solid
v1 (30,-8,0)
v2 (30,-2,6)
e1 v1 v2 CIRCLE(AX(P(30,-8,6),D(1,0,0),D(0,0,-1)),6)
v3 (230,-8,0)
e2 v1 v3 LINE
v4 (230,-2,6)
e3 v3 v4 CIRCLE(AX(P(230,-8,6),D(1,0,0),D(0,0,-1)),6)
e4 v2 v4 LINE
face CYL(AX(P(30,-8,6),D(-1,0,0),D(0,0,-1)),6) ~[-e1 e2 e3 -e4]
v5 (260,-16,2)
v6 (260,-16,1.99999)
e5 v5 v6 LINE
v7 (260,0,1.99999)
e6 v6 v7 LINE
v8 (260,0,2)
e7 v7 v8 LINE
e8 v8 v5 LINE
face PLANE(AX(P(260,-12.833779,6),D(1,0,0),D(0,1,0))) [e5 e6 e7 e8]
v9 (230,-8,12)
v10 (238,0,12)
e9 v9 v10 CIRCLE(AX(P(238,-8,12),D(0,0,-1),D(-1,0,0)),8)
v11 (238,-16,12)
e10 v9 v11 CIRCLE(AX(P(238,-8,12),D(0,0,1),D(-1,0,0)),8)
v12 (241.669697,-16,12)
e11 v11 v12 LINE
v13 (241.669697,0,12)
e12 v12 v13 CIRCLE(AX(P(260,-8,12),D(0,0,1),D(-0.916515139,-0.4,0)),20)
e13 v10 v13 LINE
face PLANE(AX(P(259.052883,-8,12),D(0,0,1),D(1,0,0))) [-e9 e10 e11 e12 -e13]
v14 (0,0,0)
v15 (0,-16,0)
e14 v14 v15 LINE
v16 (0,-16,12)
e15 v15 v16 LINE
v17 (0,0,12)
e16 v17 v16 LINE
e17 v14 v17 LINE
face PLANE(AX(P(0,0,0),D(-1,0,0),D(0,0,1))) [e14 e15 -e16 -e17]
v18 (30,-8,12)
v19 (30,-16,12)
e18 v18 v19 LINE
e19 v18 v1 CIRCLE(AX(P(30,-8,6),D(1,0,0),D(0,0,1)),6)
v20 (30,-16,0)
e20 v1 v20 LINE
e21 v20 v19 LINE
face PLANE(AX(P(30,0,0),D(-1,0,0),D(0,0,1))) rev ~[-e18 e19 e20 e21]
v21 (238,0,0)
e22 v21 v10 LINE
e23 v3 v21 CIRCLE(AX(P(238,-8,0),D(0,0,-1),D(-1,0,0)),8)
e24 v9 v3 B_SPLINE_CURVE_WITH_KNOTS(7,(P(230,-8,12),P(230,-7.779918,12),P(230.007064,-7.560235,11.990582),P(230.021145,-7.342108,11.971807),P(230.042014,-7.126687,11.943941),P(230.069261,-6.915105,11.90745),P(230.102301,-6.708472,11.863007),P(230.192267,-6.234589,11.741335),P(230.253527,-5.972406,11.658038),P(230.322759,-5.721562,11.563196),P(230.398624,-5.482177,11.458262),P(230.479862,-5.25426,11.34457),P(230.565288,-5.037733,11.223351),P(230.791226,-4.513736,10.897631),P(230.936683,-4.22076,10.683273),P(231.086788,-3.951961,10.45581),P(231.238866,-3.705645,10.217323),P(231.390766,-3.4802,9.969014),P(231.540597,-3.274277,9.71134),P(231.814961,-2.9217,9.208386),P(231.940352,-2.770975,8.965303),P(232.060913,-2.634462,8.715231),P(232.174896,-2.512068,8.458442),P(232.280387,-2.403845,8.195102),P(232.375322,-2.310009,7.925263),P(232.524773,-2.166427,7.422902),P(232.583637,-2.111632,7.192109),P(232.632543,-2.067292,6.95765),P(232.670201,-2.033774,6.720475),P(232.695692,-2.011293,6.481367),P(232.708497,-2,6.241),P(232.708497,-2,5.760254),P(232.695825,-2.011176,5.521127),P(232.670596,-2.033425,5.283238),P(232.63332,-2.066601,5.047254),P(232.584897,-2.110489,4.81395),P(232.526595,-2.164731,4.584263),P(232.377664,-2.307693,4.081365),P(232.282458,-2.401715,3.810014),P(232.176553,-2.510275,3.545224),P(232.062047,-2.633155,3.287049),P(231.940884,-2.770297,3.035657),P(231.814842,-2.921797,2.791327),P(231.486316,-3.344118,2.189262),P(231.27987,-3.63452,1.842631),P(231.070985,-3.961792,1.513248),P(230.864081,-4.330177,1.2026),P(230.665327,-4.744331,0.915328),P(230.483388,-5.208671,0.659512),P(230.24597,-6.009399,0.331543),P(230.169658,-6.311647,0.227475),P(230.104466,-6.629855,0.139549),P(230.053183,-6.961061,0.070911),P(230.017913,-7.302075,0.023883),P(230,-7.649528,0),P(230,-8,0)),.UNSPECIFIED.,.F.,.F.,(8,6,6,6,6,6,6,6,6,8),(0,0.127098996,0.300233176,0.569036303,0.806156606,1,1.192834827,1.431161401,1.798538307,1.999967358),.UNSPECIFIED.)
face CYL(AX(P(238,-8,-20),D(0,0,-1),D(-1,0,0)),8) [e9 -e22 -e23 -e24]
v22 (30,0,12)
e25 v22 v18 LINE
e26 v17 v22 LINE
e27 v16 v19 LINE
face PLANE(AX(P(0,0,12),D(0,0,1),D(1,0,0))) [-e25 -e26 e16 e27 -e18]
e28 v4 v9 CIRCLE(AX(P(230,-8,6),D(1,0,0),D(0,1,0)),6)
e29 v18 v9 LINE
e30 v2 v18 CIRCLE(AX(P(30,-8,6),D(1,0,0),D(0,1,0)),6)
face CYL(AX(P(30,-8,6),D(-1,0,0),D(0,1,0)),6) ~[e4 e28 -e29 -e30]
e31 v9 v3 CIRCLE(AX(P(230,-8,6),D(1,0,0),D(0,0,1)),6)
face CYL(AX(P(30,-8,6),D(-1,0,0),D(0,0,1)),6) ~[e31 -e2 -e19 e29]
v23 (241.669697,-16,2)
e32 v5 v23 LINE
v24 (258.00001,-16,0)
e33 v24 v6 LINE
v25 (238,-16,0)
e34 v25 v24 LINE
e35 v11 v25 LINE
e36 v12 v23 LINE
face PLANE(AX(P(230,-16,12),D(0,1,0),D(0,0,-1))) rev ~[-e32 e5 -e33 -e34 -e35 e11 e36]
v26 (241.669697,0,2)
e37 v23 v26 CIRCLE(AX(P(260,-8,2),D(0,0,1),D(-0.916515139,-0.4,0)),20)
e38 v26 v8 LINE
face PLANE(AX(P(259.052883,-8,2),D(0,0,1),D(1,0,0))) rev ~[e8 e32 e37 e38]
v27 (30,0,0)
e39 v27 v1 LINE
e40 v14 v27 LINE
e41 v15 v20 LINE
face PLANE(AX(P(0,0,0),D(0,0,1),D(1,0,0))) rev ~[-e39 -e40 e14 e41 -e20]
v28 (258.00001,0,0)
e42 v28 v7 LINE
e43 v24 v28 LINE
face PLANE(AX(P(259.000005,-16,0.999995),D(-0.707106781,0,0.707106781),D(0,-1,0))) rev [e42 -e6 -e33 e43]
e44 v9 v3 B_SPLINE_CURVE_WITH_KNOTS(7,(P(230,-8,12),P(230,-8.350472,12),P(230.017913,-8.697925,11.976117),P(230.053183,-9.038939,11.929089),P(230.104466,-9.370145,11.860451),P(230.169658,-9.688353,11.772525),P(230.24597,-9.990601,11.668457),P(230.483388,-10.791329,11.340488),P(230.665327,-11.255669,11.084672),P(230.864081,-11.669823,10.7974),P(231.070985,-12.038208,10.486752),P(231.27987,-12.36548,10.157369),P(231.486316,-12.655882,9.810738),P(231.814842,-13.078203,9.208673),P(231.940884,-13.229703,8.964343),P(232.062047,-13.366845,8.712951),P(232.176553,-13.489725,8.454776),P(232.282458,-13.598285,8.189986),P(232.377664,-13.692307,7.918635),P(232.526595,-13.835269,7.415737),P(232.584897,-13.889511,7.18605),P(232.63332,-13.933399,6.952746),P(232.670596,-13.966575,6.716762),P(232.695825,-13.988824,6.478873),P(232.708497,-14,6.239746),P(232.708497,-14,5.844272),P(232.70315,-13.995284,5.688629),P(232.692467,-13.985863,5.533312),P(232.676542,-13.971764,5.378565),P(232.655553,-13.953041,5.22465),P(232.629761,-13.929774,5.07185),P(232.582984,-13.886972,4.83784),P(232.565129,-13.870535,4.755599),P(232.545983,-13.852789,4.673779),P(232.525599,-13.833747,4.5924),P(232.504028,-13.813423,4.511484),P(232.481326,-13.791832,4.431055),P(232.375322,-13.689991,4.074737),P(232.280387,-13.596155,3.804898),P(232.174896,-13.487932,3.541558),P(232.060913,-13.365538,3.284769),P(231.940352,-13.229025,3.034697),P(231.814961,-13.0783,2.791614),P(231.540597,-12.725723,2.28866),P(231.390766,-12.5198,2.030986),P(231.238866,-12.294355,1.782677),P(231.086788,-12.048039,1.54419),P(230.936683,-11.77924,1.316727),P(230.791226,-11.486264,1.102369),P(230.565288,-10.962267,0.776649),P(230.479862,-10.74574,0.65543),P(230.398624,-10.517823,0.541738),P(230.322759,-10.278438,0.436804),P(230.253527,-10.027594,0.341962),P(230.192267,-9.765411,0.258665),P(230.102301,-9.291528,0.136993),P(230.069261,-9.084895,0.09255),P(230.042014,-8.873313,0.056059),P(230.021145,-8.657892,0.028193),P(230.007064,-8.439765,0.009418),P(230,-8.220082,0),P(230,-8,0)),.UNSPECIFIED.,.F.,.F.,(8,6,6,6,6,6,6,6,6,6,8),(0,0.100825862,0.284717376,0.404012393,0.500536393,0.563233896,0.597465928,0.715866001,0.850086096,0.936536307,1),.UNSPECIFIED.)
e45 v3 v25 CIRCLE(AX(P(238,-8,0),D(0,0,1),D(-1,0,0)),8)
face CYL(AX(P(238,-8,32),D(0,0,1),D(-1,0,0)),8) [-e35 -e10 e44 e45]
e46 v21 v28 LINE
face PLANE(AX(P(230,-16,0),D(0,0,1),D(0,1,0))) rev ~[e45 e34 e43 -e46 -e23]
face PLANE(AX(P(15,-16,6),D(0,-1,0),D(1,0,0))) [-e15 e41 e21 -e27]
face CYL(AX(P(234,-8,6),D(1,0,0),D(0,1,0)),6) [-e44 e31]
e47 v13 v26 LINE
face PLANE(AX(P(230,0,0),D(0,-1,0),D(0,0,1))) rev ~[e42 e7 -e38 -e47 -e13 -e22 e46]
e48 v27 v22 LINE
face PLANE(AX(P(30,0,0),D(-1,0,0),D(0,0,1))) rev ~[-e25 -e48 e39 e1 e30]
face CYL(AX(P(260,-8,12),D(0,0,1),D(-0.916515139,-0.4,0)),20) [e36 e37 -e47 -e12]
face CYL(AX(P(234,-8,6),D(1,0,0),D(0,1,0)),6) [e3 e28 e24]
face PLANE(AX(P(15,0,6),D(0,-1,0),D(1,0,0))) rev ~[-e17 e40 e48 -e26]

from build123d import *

# Parameters (mm, degrees)
F0_W         = 30
F0_H         = 12
F1_DEPTH     = 16
F3_DEPTH     = 200
F5_DEPTH     = 30
F7_DEPTH     = 10
F8_T4_DEPTH  = 52
F8_S5_R      = 6
F8_T6_DEPTH  = 28
F8_T10_DEPTH = 52
F8_S11_R     = 6
F8_T12_DEPTH = 28
F9_SIZE      = 1.99999


# Not quite as in the source:
# - a fillet or chamfer that OpenCascade refuses, or shapes differently, is made with other operations: its cross-section is extruded or revolved along the edge and cut away or added
# - a fillet or chamfer is up to 0.001 mm smaller than in the source, because OpenCascade refuses the exact size


with BuildPart() as f1:
    # F0 (on Front) → F1 (new body)
    with BuildSketch(Plane.XZ):
        with Locations((15, 6)):
            Rectangle(F0_W, F0_H)
    extrude(amount=F1_DEPTH)

    # F2 (on face) → F3 (join)
    with BuildSketch(Plane.YZ.offset(30)):
        with BuildLine():
            ThreePointArc((-8, 0), (-3.7573593129, 1.7573593129), (-2, 6))
            ThreePointArc((-2, 6), (-3.7573593129, 10.2426406871), (-8, 12))
            ThreePointArc((-8, 12), (-14, 6), (-8, 0))
        make_face()
    extrude(amount=F3_DEPTH)

    # F4 (on face) → F5 (join)
    with BuildSketch(Plane.YZ.offset(230)):
        with BuildLine():
            Line((-8, 12), (-16, 12))
            Line((-16, 12), (-16, 0))
            Line((-16, 0), (-8, 0))
            ThreePointArc((-8, 0), (-14, 6), (-8, 12))
        make_face()
        with BuildLine():
            Line((0, 12), (-8, 12))
            ThreePointArc((-8, 12), (-3.7573593129, 10.2426406871), (-2, 6))
            ThreePointArc((-2, 6), (-3.7573593129, 1.7573593129), (-8, 0))
            Line((-8, 0), (0, 0))
            Line((0, 0), (0, 12))
        make_face()
        with BuildLine():
            ThreePointArc((-2, 6), (-3.7573593129, 10.2426406871), (-8, 12))
            ThreePointArc((-8, 12), (-14, 6), (-8, 0))
            ThreePointArc((-8, 0), (-3.7573593129, 1.7573593129), (-2, 6))
        make_face()
    extrude(amount=F5_DEPTH)

    # F6 (on face) → F7 (join)
    with BuildSketch(Plane.XY.offset(12)):
        with BuildLine():
            ThreePointArc((241.6696972202, -16), (264.0861928738, -27.5781262586), (280, -8))
            ThreePointArc((280, -8), (264.0861928738, 11.5781262586), (241.6696972202, 0))
            Line((241.6696972202, 0), (260, 0))
            Line((260, 0), (260, -16))
            Line((260, -16), (241.6696972202, -16))
        make_face()
    extrude(amount=-F7_DEPTH)

    # F8: fillet of radius 8 on 2 edges, made by hand


with BuildPart() as f8_tool2:
    # F8_s3 → F8_t4 (new body)
    with BuildSketch(Plane.XY.offset(-20)):
        with BuildLine():
            ThreePointArc((230, -8), (232.3431457505, -2.3431457505), (238, 0))
            Line((238, 0), (230, 0))
            Line((230, 0), (230, -8))
        make_face()
    extrude(amount=F8_T4_DEPTH)

    # F8_s5 → F8_t6 (cut, symmetric)
    with BuildSketch(Plane.YZ.offset(234)):
        with Locations((-8, 6)):
            Circle(F8_S5_R)
    extrude(amount=F8_T6_DEPTH, both=True, mode=Mode.SUBTRACT)


with BuildPart() as f1_1:
    add(f1.part)

    # F8_t1: cut F8_tool2
    add(f8_tool2.part, mode=Mode.SUBTRACT)


with BuildPart() as f8_tool8:
    # F8_s9 → F8_t10 (new body)
    with BuildSketch(Plane.XY.offset(32)):
        with BuildLine():
            ThreePointArc((230, -8), (232.3431457505, -13.6568542495), (238, -16))
            Line((238, -16), (230, -16))
            Line((230, -16), (230, -8))
        make_face()
    extrude(amount=-F8_T10_DEPTH)

    # F8_s11 → F8_t12 (cut, symmetric)
    with BuildSketch(Plane.YZ.offset(234)):
        with Locations((-8, 6)):
            Circle(F8_S11_R)
    extrude(amount=F8_T12_DEPTH, both=True, mode=Mode.SUBTRACT)


with BuildPart() as f1_2:
    add(f1_1.part)

    # F8_t7: cut F8_tool8
    add(f8_tool8.part, mode=Mode.SUBTRACT)

    # F9 (size 2 in the source; OpenCascade refuses exactly that, so slightly less here)
    f9_edges = [f1_2.edges().sort_by_distance(p)[0] for p in [
        (260, -8, 0),
    ]]
    chamfer(f9_edges, length=F9_SIZE)


solid = f1_2.part
